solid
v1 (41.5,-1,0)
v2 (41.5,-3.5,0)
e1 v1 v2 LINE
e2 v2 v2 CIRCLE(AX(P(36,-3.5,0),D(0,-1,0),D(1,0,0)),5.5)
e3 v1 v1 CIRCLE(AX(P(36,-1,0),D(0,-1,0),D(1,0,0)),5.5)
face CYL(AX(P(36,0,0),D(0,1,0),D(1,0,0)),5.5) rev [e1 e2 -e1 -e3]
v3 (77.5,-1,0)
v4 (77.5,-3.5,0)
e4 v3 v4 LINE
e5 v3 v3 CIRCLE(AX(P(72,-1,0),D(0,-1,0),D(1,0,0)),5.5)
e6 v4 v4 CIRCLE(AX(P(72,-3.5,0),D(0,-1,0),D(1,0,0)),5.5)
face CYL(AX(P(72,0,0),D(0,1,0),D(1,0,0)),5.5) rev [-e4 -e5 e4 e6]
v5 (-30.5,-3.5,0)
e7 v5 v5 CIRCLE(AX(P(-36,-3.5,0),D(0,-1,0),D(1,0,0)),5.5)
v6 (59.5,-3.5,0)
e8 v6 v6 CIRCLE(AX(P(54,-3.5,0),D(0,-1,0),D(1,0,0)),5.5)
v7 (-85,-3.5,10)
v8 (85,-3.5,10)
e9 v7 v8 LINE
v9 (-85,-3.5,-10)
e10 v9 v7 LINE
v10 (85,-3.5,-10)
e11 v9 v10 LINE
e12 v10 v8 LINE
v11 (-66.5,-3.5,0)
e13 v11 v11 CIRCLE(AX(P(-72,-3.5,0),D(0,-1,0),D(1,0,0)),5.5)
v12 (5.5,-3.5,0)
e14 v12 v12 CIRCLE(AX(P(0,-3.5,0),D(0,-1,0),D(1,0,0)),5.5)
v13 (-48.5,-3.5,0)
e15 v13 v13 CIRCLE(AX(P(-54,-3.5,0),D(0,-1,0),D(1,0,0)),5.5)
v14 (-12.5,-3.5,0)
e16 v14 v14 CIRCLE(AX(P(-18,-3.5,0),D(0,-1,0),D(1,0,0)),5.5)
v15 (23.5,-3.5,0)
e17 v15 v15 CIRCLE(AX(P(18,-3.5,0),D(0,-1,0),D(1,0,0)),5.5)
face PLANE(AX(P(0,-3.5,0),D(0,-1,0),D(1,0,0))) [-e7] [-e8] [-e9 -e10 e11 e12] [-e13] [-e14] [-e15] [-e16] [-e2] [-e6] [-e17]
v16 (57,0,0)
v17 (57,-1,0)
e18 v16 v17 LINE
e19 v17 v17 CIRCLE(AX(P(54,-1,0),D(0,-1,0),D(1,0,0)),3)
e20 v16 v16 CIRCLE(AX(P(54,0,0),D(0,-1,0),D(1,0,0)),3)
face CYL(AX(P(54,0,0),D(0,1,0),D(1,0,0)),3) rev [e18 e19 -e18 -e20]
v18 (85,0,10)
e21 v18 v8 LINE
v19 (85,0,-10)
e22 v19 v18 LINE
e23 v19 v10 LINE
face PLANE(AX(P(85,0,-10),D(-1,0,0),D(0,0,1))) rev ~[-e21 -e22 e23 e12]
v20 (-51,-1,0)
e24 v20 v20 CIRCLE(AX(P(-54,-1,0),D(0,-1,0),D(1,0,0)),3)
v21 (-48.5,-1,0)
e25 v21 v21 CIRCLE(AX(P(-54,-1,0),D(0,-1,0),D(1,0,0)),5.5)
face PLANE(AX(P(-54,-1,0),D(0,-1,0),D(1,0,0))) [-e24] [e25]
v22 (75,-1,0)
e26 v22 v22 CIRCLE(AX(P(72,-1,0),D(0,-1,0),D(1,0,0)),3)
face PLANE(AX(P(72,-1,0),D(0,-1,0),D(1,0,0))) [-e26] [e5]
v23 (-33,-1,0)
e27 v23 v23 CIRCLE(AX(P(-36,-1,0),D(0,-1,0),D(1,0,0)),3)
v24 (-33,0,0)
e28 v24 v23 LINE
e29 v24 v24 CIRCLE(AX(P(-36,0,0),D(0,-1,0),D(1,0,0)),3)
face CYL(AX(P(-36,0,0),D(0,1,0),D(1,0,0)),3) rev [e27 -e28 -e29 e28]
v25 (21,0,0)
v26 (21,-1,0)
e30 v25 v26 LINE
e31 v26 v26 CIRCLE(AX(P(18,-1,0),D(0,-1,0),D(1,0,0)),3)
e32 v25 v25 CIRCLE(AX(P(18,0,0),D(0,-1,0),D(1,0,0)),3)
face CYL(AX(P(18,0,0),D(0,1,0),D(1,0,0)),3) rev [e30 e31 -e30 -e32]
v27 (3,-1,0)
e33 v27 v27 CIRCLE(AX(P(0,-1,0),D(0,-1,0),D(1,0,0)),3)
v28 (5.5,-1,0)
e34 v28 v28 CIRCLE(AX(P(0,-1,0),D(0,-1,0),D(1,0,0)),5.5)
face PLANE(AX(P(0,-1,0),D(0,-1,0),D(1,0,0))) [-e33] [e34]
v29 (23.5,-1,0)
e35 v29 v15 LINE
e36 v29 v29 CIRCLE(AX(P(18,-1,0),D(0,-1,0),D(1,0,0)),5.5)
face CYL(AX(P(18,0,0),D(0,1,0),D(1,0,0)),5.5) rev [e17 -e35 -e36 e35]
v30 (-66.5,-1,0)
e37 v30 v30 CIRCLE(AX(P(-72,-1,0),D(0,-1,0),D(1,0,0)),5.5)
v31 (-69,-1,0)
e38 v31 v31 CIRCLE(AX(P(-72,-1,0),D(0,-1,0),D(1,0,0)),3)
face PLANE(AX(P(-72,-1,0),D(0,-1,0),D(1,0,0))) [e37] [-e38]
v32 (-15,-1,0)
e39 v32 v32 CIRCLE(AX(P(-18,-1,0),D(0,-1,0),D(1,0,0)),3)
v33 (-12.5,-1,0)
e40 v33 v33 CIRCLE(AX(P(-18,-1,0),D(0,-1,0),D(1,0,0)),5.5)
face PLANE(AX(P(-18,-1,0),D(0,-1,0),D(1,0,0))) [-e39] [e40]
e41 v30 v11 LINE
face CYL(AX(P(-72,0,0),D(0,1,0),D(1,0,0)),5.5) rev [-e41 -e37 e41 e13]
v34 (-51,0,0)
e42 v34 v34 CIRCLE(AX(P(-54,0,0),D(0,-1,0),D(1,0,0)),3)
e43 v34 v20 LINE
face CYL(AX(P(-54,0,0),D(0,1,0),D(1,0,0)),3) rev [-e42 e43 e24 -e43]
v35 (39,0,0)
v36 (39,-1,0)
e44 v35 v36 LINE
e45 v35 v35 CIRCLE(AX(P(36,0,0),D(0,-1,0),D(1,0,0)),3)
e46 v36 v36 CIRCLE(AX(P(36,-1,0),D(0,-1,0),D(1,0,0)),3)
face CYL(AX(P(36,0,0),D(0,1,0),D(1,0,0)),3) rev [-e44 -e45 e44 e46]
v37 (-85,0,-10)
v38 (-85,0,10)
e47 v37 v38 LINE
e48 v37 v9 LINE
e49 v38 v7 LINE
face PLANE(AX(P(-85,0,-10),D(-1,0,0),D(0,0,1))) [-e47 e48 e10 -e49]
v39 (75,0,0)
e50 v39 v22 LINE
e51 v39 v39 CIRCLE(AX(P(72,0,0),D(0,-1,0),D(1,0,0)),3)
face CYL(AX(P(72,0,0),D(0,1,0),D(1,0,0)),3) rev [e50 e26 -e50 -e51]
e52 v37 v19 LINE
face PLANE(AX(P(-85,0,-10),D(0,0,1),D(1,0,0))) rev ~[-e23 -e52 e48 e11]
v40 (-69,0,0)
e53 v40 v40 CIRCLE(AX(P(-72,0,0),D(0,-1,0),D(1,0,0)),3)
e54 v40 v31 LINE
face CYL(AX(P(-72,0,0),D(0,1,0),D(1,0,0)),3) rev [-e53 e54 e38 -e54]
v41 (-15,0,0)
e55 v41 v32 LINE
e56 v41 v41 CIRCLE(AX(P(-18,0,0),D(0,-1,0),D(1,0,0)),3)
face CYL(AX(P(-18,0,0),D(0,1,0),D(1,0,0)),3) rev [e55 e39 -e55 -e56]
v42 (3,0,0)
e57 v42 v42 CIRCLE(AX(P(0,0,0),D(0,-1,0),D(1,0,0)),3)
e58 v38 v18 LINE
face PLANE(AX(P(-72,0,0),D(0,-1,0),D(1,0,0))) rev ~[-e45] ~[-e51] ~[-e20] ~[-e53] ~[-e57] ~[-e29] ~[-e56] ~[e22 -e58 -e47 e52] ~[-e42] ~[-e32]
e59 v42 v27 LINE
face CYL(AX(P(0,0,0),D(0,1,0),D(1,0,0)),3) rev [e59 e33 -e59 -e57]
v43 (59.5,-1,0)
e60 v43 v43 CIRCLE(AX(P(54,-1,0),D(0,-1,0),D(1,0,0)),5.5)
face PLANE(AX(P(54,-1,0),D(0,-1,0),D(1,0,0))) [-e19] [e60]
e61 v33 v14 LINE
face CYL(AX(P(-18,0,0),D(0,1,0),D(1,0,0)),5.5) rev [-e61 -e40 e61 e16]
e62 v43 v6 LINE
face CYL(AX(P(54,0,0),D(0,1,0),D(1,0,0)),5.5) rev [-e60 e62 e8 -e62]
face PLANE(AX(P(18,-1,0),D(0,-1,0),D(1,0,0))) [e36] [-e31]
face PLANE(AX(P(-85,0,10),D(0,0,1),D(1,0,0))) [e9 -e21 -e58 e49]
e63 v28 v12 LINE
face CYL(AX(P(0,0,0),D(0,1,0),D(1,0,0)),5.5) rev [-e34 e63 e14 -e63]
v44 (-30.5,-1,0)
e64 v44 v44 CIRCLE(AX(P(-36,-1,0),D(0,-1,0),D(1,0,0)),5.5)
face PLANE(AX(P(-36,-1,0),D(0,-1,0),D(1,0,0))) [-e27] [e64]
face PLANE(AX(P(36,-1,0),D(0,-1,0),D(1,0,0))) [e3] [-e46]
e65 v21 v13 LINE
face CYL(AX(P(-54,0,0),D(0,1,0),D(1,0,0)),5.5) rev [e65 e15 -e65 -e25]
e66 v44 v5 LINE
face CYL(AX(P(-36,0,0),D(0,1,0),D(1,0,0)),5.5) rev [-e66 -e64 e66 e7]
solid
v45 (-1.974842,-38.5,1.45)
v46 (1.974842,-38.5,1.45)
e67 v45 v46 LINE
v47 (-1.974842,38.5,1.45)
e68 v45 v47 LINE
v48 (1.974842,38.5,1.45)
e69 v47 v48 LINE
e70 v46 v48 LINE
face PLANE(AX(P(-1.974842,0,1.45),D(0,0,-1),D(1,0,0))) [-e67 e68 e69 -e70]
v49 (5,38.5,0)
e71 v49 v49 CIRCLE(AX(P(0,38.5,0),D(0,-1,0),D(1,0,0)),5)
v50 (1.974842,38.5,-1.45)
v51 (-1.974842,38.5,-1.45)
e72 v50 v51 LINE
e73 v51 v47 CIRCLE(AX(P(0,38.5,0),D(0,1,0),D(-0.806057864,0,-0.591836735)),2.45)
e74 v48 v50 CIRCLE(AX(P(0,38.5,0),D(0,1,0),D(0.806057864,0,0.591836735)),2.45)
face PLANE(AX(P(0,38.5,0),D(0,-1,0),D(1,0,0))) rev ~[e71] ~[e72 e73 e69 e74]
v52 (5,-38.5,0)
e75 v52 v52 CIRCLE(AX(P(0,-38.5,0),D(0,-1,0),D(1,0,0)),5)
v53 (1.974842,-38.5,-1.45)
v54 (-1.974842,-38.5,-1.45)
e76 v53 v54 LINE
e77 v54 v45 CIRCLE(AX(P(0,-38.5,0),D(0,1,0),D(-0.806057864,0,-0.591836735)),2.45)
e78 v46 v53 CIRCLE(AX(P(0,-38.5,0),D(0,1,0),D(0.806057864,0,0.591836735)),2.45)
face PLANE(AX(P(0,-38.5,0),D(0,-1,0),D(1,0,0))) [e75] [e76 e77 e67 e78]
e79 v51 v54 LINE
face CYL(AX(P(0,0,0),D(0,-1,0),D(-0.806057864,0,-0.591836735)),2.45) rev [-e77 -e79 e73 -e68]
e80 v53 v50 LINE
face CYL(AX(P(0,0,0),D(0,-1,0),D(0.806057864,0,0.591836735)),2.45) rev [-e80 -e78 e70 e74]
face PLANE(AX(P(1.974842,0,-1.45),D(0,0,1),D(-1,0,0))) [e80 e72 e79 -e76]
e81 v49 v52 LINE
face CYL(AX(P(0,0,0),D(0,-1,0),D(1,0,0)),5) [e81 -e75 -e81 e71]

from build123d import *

# Parameters (mm, degrees)
F0_R     = 5
F1_DEPTH = 38.5
F2_W     = 170
F2_H     = 20
F2_R     = 5.5
F3_DEPTH = 3.5
F2_R_2   = 3
F4_DEPTH = 1


with BuildPart() as f1:
    # F0 (on Front) → F1 (new body, symmetric)
    with BuildSketch(Plane.XZ):
        Circle(F0_R)
        with BuildLine():
            ThreePointArc((-1.9748417658, -1.45), (-2.45, 0), (-1.9748417658, 1.45))
            Line((-1.9748417658, 1.45), (1.9748417658, 1.45))
            ThreePointArc((1.9748417658, 1.45), (2.45, 0), (1.9748417658, -1.45))
            Line((1.9748417658, -1.45), (-1.9748417658, -1.45))
        make_face(mode=Mode.SUBTRACT)
    extrude(amount=F1_DEPTH, both=True)


with BuildPart() as f3:
    # F2 (on Front) → F3 (new body)
    with BuildSketch(Plane.XZ):
        Rectangle(F2_W, F2_H)
        with Locations((-72, 0)):
            Circle(F2_R, mode=Mode.SUBTRACT)
        with Locations((-54, 0)):
            Circle(F2_R, mode=Mode.SUBTRACT)
        with Locations((-36, 0)):
            Circle(F2_R, mode=Mode.SUBTRACT)
        with Locations((-18, 0)):
            Circle(F2_R, mode=Mode.SUBTRACT)
        Circle(F2_R, mode=Mode.SUBTRACT)
        with Locations((18, 0)):
            Circle(F2_R, mode=Mode.SUBTRACT)
        with Locations((36, 0)):
            Circle(F2_R, mode=Mode.SUBTRACT)
        with Locations((54, 0)):
            Circle(F2_R, mode=Mode.SUBTRACT)
        with Locations((72, 0)):
            Circle(F2_R, mode=Mode.SUBTRACT)
    extrude(amount=F3_DEPTH)

    # F2 (on Front) → F4 (join)
    with BuildSketch(Plane.XZ):
        with Locations((-72, 0)):
            Circle(F2_R)
        with Locations((-72, 0)):
            Circle(F2_R_2, mode=Mode.SUBTRACT)
        with Locations((-54, 0)):
            Circle(F2_R)
        with Locations((-54, 0)):
            Circle(F2_R_2, mode=Mode.SUBTRACT)
        with Locations((-36, 0)):
            Circle(F2_R)
        with Locations((-36, 0)):
            Circle(F2_R_2, mode=Mode.SUBTRACT)
        with Locations((-18, 0)):
            Circle(F2_R)
        with Locations((-18, 0)):
            Circle(F2_R_2, mode=Mode.SUBTRACT)
        Circle(F2_R)
        Circle(F2_R_2, mode=Mode.SUBTRACT)
        with Locations((18, 0)):
            Circle(F2_R)
        with Locations((18, 0)):
            Circle(F2_R_2, mode=Mode.SUBTRACT)
        with Locations((36, 0)):
            Circle(F2_R)
        with Locations((36, 0)):
            Circle(F2_R_2, mode=Mode.SUBTRACT)
        with Locations((54, 0)):
            Circle(F2_R)
        with Locations((54, 0)):
            Circle(F2_R_2, mode=Mode.SUBTRACT)
        with Locations((72, 0)):
            Circle(F2_R)
        with Locations((72, 0)):
            Circle(F2_R_2, mode=Mode.SUBTRACT)
    extrude(amount=F4_DEPTH)


solid = Compound([f1.part, f3.part])
